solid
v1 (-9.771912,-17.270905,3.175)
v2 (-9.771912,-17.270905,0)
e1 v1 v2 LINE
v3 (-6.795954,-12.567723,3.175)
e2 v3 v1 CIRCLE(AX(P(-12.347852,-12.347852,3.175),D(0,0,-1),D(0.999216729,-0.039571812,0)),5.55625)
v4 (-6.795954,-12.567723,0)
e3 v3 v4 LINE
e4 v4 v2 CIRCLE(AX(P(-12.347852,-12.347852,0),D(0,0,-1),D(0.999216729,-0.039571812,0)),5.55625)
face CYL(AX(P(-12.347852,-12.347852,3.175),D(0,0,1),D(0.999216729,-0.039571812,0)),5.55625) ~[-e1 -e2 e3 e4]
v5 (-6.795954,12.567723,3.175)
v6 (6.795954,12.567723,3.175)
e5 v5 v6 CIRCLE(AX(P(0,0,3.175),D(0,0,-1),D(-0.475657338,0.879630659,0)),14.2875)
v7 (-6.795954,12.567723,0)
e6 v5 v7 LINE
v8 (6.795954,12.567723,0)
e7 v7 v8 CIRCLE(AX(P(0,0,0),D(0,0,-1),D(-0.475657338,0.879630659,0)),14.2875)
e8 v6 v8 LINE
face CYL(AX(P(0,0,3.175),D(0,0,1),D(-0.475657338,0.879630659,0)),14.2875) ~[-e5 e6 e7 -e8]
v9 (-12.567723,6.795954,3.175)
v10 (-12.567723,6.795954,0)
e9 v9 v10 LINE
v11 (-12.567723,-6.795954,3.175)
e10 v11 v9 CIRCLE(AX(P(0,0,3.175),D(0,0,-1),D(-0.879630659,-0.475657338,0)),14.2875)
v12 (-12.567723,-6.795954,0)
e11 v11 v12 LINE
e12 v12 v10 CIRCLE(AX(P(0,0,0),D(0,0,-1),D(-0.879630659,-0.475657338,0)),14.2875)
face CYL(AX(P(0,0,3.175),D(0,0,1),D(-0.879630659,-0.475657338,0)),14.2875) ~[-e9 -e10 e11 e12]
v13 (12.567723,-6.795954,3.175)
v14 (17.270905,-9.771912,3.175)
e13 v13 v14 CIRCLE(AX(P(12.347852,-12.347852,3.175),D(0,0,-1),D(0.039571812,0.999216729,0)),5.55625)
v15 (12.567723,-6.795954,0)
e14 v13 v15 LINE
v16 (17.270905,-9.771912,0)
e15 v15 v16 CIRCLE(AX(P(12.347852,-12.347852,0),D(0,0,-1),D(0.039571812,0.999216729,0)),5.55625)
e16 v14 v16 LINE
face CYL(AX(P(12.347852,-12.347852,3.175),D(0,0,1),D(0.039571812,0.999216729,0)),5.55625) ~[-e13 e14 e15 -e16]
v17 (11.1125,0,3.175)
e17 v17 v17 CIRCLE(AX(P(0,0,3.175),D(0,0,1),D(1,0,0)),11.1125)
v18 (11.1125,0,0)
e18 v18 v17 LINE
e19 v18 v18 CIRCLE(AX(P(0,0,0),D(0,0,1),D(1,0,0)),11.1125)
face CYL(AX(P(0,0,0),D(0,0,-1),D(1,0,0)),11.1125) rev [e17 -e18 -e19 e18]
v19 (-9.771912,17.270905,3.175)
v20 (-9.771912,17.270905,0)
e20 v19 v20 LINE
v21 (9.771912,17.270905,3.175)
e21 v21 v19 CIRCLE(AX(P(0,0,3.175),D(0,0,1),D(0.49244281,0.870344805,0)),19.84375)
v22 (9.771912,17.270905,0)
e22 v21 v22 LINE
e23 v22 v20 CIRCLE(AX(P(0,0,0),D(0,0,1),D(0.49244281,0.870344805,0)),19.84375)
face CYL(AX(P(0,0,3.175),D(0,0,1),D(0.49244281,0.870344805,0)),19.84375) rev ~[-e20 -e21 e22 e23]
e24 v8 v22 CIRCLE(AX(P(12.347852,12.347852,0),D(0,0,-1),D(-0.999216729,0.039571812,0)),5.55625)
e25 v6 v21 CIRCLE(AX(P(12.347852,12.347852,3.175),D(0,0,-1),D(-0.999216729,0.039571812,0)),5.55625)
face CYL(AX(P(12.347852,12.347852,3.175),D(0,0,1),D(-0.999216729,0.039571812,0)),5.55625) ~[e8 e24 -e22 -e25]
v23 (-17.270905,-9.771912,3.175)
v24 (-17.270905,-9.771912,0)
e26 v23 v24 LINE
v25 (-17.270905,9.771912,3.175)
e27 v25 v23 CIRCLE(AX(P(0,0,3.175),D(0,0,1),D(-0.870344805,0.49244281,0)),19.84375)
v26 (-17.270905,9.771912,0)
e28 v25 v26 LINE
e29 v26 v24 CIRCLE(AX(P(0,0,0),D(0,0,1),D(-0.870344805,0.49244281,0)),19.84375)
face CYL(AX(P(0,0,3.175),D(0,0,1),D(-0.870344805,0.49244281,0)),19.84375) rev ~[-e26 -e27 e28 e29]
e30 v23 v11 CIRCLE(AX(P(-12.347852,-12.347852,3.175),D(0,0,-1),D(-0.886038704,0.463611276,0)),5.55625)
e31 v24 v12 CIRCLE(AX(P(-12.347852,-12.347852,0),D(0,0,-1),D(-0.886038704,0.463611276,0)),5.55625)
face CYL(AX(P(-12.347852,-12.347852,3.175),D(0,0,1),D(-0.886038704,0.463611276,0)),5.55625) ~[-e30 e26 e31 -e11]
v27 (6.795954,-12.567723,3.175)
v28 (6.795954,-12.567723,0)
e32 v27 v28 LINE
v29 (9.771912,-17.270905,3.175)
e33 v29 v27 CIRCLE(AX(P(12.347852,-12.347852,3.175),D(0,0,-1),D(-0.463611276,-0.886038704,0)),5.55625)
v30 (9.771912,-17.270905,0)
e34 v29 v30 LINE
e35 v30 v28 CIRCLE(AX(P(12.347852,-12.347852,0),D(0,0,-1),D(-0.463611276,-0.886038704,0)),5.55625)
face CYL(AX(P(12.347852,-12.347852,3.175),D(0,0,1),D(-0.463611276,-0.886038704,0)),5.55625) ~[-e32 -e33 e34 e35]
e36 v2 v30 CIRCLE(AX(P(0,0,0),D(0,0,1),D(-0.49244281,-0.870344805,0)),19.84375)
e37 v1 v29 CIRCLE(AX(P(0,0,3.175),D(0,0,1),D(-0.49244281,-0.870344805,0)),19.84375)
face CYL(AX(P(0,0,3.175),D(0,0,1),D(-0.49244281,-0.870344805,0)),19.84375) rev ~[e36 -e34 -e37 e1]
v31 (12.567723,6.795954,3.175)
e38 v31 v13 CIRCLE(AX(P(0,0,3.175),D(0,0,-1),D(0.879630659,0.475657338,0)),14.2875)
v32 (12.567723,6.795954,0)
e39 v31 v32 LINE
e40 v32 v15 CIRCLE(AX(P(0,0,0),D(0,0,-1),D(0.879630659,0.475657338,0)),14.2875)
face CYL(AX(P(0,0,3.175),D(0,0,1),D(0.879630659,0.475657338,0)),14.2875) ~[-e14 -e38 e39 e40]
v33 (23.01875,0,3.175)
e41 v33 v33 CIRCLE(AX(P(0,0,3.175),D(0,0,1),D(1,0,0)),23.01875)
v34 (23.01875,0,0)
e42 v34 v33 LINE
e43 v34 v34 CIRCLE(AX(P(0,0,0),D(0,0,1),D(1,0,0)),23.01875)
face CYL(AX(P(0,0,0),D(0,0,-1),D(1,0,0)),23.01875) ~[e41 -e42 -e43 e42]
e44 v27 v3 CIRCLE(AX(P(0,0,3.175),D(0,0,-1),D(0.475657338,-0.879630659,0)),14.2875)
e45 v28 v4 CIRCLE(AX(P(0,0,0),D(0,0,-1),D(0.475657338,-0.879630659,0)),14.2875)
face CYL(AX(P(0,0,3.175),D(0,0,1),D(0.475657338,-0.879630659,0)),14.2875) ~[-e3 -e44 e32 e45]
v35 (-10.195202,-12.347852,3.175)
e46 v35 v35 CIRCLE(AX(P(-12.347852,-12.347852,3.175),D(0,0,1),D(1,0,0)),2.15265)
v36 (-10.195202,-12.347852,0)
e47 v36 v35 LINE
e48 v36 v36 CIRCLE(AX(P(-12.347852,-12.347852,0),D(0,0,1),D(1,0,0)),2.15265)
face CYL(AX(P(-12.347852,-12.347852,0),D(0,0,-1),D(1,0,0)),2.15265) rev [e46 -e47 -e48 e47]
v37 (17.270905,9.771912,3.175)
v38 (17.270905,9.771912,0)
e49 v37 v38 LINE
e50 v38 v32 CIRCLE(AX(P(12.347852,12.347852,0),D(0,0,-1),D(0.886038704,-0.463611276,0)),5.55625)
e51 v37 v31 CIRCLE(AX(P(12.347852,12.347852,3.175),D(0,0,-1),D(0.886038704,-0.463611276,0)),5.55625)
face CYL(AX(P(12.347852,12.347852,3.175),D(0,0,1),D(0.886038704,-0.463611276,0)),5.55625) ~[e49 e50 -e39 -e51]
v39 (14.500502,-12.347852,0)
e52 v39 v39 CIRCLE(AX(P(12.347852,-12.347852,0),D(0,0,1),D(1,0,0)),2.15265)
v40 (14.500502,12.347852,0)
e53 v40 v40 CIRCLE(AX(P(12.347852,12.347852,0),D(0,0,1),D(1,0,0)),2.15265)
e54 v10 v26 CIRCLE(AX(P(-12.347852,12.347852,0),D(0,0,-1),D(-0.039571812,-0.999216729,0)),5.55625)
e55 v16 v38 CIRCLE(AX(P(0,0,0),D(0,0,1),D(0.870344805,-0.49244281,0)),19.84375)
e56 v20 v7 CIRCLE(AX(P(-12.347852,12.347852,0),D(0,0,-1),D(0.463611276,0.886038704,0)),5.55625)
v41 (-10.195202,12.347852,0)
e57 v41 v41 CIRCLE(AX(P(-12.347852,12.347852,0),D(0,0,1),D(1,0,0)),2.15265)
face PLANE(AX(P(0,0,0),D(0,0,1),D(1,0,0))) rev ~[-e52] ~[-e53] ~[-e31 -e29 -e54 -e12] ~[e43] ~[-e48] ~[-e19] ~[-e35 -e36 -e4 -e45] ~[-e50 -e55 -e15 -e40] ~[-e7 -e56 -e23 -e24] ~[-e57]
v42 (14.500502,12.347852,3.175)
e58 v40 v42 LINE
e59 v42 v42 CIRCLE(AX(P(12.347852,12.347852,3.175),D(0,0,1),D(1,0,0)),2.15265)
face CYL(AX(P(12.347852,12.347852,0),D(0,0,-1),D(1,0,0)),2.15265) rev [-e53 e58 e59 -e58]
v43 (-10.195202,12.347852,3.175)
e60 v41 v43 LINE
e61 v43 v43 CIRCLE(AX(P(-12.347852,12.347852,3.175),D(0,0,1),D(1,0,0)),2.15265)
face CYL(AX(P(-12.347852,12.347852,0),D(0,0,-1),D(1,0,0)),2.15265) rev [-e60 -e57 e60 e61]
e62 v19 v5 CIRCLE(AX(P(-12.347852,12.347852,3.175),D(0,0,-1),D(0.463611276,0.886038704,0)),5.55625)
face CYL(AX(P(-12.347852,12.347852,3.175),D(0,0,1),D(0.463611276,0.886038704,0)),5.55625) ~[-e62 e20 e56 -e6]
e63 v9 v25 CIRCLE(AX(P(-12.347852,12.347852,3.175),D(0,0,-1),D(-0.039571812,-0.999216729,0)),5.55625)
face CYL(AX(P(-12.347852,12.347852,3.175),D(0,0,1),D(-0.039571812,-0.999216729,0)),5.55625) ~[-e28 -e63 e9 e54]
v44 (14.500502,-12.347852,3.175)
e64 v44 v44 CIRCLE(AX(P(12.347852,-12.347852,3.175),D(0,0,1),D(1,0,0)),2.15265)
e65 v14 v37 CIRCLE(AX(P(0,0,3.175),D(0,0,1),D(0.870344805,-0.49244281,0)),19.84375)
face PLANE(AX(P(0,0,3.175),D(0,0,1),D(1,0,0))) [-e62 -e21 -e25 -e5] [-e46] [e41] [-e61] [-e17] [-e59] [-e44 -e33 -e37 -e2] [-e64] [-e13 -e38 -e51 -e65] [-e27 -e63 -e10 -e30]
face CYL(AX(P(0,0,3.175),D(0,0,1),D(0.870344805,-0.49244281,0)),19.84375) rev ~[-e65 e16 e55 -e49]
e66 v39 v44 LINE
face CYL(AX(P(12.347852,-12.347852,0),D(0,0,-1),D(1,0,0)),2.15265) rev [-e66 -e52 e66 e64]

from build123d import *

# Parameters (mm, degrees)
F0_R            = 23.01875
F0_R_2          = 2.15265
F0_R_3          = 11.1125
F1_DEPTH        = 3.175
F3_DEPTH        = 3.175
F3_COPIES_COUNT = 4


# Not quite as in the source:
# - a pattern or mirror of a feature is missing from the dataset's text; its kind, count and spacing are read off the source's solid


with BuildPart() as f1:
    # F0 (on Top) → F1 (new body)
    with BuildSketch(Plane.XY):
        Circle(F0_R)
        with Locations((-12.3478521665, -12.3478521665)):
            Circle(F0_R_2, mode=Mode.SUBTRACT)
        with Locations((12.3478521665, -12.3478521665)):
            Circle(F0_R_2, mode=Mode.SUBTRACT)
        with Locations((-12.3478521665, 12.3478521665)):
            Circle(F0_R_2, mode=Mode.SUBTRACT)
        Circle(F0_R_3, mode=Mode.SUBTRACT)
        with Locations((12.3478521665, 12.3478521665)):
            Circle(F0_R_2, mode=Mode.SUBTRACT)
    extrude(amount=F1_DEPTH)

    # F2 (on face) → F3 (cut, through all)
    with BuildSketch(Plane.XY.offset(3.175)):
        with BuildLine():
            ThreePointArc((-9.7719120136, 17.2709047146), (-7.6525973796, 15.318794197), (-6.7959542154, 12.5677230456))
            ThreePointArc((-6.7959542154, 12.5677230456), (0, 14.2875), (6.7959542154, 12.5677230456))
            ThreePointArc((6.7959542154, 12.5677230456), (7.6525973796, 15.318794197), (9.7719120136, 17.2709047146))
            ThreePointArc((9.7719120136, 17.2709047146), (0, 19.84375), (-9.7719120136, 17.2709047146))
        make_face()
    f3 = extrude(amount=-F3_DEPTH, mode=Mode.SUBTRACT)

    # F3_copies: F3 ×4 about axis
    f3_copies_axis = Axis((0, 0, 0), (0, 0, 1))
    for i in range(1, F3_COPIES_COUNT):
        add(f3.rotate(f3_copies_axis, i * 360 / F3_COPIES_COUNT), mode=Mode.SUBTRACT)


solid = f1.part
